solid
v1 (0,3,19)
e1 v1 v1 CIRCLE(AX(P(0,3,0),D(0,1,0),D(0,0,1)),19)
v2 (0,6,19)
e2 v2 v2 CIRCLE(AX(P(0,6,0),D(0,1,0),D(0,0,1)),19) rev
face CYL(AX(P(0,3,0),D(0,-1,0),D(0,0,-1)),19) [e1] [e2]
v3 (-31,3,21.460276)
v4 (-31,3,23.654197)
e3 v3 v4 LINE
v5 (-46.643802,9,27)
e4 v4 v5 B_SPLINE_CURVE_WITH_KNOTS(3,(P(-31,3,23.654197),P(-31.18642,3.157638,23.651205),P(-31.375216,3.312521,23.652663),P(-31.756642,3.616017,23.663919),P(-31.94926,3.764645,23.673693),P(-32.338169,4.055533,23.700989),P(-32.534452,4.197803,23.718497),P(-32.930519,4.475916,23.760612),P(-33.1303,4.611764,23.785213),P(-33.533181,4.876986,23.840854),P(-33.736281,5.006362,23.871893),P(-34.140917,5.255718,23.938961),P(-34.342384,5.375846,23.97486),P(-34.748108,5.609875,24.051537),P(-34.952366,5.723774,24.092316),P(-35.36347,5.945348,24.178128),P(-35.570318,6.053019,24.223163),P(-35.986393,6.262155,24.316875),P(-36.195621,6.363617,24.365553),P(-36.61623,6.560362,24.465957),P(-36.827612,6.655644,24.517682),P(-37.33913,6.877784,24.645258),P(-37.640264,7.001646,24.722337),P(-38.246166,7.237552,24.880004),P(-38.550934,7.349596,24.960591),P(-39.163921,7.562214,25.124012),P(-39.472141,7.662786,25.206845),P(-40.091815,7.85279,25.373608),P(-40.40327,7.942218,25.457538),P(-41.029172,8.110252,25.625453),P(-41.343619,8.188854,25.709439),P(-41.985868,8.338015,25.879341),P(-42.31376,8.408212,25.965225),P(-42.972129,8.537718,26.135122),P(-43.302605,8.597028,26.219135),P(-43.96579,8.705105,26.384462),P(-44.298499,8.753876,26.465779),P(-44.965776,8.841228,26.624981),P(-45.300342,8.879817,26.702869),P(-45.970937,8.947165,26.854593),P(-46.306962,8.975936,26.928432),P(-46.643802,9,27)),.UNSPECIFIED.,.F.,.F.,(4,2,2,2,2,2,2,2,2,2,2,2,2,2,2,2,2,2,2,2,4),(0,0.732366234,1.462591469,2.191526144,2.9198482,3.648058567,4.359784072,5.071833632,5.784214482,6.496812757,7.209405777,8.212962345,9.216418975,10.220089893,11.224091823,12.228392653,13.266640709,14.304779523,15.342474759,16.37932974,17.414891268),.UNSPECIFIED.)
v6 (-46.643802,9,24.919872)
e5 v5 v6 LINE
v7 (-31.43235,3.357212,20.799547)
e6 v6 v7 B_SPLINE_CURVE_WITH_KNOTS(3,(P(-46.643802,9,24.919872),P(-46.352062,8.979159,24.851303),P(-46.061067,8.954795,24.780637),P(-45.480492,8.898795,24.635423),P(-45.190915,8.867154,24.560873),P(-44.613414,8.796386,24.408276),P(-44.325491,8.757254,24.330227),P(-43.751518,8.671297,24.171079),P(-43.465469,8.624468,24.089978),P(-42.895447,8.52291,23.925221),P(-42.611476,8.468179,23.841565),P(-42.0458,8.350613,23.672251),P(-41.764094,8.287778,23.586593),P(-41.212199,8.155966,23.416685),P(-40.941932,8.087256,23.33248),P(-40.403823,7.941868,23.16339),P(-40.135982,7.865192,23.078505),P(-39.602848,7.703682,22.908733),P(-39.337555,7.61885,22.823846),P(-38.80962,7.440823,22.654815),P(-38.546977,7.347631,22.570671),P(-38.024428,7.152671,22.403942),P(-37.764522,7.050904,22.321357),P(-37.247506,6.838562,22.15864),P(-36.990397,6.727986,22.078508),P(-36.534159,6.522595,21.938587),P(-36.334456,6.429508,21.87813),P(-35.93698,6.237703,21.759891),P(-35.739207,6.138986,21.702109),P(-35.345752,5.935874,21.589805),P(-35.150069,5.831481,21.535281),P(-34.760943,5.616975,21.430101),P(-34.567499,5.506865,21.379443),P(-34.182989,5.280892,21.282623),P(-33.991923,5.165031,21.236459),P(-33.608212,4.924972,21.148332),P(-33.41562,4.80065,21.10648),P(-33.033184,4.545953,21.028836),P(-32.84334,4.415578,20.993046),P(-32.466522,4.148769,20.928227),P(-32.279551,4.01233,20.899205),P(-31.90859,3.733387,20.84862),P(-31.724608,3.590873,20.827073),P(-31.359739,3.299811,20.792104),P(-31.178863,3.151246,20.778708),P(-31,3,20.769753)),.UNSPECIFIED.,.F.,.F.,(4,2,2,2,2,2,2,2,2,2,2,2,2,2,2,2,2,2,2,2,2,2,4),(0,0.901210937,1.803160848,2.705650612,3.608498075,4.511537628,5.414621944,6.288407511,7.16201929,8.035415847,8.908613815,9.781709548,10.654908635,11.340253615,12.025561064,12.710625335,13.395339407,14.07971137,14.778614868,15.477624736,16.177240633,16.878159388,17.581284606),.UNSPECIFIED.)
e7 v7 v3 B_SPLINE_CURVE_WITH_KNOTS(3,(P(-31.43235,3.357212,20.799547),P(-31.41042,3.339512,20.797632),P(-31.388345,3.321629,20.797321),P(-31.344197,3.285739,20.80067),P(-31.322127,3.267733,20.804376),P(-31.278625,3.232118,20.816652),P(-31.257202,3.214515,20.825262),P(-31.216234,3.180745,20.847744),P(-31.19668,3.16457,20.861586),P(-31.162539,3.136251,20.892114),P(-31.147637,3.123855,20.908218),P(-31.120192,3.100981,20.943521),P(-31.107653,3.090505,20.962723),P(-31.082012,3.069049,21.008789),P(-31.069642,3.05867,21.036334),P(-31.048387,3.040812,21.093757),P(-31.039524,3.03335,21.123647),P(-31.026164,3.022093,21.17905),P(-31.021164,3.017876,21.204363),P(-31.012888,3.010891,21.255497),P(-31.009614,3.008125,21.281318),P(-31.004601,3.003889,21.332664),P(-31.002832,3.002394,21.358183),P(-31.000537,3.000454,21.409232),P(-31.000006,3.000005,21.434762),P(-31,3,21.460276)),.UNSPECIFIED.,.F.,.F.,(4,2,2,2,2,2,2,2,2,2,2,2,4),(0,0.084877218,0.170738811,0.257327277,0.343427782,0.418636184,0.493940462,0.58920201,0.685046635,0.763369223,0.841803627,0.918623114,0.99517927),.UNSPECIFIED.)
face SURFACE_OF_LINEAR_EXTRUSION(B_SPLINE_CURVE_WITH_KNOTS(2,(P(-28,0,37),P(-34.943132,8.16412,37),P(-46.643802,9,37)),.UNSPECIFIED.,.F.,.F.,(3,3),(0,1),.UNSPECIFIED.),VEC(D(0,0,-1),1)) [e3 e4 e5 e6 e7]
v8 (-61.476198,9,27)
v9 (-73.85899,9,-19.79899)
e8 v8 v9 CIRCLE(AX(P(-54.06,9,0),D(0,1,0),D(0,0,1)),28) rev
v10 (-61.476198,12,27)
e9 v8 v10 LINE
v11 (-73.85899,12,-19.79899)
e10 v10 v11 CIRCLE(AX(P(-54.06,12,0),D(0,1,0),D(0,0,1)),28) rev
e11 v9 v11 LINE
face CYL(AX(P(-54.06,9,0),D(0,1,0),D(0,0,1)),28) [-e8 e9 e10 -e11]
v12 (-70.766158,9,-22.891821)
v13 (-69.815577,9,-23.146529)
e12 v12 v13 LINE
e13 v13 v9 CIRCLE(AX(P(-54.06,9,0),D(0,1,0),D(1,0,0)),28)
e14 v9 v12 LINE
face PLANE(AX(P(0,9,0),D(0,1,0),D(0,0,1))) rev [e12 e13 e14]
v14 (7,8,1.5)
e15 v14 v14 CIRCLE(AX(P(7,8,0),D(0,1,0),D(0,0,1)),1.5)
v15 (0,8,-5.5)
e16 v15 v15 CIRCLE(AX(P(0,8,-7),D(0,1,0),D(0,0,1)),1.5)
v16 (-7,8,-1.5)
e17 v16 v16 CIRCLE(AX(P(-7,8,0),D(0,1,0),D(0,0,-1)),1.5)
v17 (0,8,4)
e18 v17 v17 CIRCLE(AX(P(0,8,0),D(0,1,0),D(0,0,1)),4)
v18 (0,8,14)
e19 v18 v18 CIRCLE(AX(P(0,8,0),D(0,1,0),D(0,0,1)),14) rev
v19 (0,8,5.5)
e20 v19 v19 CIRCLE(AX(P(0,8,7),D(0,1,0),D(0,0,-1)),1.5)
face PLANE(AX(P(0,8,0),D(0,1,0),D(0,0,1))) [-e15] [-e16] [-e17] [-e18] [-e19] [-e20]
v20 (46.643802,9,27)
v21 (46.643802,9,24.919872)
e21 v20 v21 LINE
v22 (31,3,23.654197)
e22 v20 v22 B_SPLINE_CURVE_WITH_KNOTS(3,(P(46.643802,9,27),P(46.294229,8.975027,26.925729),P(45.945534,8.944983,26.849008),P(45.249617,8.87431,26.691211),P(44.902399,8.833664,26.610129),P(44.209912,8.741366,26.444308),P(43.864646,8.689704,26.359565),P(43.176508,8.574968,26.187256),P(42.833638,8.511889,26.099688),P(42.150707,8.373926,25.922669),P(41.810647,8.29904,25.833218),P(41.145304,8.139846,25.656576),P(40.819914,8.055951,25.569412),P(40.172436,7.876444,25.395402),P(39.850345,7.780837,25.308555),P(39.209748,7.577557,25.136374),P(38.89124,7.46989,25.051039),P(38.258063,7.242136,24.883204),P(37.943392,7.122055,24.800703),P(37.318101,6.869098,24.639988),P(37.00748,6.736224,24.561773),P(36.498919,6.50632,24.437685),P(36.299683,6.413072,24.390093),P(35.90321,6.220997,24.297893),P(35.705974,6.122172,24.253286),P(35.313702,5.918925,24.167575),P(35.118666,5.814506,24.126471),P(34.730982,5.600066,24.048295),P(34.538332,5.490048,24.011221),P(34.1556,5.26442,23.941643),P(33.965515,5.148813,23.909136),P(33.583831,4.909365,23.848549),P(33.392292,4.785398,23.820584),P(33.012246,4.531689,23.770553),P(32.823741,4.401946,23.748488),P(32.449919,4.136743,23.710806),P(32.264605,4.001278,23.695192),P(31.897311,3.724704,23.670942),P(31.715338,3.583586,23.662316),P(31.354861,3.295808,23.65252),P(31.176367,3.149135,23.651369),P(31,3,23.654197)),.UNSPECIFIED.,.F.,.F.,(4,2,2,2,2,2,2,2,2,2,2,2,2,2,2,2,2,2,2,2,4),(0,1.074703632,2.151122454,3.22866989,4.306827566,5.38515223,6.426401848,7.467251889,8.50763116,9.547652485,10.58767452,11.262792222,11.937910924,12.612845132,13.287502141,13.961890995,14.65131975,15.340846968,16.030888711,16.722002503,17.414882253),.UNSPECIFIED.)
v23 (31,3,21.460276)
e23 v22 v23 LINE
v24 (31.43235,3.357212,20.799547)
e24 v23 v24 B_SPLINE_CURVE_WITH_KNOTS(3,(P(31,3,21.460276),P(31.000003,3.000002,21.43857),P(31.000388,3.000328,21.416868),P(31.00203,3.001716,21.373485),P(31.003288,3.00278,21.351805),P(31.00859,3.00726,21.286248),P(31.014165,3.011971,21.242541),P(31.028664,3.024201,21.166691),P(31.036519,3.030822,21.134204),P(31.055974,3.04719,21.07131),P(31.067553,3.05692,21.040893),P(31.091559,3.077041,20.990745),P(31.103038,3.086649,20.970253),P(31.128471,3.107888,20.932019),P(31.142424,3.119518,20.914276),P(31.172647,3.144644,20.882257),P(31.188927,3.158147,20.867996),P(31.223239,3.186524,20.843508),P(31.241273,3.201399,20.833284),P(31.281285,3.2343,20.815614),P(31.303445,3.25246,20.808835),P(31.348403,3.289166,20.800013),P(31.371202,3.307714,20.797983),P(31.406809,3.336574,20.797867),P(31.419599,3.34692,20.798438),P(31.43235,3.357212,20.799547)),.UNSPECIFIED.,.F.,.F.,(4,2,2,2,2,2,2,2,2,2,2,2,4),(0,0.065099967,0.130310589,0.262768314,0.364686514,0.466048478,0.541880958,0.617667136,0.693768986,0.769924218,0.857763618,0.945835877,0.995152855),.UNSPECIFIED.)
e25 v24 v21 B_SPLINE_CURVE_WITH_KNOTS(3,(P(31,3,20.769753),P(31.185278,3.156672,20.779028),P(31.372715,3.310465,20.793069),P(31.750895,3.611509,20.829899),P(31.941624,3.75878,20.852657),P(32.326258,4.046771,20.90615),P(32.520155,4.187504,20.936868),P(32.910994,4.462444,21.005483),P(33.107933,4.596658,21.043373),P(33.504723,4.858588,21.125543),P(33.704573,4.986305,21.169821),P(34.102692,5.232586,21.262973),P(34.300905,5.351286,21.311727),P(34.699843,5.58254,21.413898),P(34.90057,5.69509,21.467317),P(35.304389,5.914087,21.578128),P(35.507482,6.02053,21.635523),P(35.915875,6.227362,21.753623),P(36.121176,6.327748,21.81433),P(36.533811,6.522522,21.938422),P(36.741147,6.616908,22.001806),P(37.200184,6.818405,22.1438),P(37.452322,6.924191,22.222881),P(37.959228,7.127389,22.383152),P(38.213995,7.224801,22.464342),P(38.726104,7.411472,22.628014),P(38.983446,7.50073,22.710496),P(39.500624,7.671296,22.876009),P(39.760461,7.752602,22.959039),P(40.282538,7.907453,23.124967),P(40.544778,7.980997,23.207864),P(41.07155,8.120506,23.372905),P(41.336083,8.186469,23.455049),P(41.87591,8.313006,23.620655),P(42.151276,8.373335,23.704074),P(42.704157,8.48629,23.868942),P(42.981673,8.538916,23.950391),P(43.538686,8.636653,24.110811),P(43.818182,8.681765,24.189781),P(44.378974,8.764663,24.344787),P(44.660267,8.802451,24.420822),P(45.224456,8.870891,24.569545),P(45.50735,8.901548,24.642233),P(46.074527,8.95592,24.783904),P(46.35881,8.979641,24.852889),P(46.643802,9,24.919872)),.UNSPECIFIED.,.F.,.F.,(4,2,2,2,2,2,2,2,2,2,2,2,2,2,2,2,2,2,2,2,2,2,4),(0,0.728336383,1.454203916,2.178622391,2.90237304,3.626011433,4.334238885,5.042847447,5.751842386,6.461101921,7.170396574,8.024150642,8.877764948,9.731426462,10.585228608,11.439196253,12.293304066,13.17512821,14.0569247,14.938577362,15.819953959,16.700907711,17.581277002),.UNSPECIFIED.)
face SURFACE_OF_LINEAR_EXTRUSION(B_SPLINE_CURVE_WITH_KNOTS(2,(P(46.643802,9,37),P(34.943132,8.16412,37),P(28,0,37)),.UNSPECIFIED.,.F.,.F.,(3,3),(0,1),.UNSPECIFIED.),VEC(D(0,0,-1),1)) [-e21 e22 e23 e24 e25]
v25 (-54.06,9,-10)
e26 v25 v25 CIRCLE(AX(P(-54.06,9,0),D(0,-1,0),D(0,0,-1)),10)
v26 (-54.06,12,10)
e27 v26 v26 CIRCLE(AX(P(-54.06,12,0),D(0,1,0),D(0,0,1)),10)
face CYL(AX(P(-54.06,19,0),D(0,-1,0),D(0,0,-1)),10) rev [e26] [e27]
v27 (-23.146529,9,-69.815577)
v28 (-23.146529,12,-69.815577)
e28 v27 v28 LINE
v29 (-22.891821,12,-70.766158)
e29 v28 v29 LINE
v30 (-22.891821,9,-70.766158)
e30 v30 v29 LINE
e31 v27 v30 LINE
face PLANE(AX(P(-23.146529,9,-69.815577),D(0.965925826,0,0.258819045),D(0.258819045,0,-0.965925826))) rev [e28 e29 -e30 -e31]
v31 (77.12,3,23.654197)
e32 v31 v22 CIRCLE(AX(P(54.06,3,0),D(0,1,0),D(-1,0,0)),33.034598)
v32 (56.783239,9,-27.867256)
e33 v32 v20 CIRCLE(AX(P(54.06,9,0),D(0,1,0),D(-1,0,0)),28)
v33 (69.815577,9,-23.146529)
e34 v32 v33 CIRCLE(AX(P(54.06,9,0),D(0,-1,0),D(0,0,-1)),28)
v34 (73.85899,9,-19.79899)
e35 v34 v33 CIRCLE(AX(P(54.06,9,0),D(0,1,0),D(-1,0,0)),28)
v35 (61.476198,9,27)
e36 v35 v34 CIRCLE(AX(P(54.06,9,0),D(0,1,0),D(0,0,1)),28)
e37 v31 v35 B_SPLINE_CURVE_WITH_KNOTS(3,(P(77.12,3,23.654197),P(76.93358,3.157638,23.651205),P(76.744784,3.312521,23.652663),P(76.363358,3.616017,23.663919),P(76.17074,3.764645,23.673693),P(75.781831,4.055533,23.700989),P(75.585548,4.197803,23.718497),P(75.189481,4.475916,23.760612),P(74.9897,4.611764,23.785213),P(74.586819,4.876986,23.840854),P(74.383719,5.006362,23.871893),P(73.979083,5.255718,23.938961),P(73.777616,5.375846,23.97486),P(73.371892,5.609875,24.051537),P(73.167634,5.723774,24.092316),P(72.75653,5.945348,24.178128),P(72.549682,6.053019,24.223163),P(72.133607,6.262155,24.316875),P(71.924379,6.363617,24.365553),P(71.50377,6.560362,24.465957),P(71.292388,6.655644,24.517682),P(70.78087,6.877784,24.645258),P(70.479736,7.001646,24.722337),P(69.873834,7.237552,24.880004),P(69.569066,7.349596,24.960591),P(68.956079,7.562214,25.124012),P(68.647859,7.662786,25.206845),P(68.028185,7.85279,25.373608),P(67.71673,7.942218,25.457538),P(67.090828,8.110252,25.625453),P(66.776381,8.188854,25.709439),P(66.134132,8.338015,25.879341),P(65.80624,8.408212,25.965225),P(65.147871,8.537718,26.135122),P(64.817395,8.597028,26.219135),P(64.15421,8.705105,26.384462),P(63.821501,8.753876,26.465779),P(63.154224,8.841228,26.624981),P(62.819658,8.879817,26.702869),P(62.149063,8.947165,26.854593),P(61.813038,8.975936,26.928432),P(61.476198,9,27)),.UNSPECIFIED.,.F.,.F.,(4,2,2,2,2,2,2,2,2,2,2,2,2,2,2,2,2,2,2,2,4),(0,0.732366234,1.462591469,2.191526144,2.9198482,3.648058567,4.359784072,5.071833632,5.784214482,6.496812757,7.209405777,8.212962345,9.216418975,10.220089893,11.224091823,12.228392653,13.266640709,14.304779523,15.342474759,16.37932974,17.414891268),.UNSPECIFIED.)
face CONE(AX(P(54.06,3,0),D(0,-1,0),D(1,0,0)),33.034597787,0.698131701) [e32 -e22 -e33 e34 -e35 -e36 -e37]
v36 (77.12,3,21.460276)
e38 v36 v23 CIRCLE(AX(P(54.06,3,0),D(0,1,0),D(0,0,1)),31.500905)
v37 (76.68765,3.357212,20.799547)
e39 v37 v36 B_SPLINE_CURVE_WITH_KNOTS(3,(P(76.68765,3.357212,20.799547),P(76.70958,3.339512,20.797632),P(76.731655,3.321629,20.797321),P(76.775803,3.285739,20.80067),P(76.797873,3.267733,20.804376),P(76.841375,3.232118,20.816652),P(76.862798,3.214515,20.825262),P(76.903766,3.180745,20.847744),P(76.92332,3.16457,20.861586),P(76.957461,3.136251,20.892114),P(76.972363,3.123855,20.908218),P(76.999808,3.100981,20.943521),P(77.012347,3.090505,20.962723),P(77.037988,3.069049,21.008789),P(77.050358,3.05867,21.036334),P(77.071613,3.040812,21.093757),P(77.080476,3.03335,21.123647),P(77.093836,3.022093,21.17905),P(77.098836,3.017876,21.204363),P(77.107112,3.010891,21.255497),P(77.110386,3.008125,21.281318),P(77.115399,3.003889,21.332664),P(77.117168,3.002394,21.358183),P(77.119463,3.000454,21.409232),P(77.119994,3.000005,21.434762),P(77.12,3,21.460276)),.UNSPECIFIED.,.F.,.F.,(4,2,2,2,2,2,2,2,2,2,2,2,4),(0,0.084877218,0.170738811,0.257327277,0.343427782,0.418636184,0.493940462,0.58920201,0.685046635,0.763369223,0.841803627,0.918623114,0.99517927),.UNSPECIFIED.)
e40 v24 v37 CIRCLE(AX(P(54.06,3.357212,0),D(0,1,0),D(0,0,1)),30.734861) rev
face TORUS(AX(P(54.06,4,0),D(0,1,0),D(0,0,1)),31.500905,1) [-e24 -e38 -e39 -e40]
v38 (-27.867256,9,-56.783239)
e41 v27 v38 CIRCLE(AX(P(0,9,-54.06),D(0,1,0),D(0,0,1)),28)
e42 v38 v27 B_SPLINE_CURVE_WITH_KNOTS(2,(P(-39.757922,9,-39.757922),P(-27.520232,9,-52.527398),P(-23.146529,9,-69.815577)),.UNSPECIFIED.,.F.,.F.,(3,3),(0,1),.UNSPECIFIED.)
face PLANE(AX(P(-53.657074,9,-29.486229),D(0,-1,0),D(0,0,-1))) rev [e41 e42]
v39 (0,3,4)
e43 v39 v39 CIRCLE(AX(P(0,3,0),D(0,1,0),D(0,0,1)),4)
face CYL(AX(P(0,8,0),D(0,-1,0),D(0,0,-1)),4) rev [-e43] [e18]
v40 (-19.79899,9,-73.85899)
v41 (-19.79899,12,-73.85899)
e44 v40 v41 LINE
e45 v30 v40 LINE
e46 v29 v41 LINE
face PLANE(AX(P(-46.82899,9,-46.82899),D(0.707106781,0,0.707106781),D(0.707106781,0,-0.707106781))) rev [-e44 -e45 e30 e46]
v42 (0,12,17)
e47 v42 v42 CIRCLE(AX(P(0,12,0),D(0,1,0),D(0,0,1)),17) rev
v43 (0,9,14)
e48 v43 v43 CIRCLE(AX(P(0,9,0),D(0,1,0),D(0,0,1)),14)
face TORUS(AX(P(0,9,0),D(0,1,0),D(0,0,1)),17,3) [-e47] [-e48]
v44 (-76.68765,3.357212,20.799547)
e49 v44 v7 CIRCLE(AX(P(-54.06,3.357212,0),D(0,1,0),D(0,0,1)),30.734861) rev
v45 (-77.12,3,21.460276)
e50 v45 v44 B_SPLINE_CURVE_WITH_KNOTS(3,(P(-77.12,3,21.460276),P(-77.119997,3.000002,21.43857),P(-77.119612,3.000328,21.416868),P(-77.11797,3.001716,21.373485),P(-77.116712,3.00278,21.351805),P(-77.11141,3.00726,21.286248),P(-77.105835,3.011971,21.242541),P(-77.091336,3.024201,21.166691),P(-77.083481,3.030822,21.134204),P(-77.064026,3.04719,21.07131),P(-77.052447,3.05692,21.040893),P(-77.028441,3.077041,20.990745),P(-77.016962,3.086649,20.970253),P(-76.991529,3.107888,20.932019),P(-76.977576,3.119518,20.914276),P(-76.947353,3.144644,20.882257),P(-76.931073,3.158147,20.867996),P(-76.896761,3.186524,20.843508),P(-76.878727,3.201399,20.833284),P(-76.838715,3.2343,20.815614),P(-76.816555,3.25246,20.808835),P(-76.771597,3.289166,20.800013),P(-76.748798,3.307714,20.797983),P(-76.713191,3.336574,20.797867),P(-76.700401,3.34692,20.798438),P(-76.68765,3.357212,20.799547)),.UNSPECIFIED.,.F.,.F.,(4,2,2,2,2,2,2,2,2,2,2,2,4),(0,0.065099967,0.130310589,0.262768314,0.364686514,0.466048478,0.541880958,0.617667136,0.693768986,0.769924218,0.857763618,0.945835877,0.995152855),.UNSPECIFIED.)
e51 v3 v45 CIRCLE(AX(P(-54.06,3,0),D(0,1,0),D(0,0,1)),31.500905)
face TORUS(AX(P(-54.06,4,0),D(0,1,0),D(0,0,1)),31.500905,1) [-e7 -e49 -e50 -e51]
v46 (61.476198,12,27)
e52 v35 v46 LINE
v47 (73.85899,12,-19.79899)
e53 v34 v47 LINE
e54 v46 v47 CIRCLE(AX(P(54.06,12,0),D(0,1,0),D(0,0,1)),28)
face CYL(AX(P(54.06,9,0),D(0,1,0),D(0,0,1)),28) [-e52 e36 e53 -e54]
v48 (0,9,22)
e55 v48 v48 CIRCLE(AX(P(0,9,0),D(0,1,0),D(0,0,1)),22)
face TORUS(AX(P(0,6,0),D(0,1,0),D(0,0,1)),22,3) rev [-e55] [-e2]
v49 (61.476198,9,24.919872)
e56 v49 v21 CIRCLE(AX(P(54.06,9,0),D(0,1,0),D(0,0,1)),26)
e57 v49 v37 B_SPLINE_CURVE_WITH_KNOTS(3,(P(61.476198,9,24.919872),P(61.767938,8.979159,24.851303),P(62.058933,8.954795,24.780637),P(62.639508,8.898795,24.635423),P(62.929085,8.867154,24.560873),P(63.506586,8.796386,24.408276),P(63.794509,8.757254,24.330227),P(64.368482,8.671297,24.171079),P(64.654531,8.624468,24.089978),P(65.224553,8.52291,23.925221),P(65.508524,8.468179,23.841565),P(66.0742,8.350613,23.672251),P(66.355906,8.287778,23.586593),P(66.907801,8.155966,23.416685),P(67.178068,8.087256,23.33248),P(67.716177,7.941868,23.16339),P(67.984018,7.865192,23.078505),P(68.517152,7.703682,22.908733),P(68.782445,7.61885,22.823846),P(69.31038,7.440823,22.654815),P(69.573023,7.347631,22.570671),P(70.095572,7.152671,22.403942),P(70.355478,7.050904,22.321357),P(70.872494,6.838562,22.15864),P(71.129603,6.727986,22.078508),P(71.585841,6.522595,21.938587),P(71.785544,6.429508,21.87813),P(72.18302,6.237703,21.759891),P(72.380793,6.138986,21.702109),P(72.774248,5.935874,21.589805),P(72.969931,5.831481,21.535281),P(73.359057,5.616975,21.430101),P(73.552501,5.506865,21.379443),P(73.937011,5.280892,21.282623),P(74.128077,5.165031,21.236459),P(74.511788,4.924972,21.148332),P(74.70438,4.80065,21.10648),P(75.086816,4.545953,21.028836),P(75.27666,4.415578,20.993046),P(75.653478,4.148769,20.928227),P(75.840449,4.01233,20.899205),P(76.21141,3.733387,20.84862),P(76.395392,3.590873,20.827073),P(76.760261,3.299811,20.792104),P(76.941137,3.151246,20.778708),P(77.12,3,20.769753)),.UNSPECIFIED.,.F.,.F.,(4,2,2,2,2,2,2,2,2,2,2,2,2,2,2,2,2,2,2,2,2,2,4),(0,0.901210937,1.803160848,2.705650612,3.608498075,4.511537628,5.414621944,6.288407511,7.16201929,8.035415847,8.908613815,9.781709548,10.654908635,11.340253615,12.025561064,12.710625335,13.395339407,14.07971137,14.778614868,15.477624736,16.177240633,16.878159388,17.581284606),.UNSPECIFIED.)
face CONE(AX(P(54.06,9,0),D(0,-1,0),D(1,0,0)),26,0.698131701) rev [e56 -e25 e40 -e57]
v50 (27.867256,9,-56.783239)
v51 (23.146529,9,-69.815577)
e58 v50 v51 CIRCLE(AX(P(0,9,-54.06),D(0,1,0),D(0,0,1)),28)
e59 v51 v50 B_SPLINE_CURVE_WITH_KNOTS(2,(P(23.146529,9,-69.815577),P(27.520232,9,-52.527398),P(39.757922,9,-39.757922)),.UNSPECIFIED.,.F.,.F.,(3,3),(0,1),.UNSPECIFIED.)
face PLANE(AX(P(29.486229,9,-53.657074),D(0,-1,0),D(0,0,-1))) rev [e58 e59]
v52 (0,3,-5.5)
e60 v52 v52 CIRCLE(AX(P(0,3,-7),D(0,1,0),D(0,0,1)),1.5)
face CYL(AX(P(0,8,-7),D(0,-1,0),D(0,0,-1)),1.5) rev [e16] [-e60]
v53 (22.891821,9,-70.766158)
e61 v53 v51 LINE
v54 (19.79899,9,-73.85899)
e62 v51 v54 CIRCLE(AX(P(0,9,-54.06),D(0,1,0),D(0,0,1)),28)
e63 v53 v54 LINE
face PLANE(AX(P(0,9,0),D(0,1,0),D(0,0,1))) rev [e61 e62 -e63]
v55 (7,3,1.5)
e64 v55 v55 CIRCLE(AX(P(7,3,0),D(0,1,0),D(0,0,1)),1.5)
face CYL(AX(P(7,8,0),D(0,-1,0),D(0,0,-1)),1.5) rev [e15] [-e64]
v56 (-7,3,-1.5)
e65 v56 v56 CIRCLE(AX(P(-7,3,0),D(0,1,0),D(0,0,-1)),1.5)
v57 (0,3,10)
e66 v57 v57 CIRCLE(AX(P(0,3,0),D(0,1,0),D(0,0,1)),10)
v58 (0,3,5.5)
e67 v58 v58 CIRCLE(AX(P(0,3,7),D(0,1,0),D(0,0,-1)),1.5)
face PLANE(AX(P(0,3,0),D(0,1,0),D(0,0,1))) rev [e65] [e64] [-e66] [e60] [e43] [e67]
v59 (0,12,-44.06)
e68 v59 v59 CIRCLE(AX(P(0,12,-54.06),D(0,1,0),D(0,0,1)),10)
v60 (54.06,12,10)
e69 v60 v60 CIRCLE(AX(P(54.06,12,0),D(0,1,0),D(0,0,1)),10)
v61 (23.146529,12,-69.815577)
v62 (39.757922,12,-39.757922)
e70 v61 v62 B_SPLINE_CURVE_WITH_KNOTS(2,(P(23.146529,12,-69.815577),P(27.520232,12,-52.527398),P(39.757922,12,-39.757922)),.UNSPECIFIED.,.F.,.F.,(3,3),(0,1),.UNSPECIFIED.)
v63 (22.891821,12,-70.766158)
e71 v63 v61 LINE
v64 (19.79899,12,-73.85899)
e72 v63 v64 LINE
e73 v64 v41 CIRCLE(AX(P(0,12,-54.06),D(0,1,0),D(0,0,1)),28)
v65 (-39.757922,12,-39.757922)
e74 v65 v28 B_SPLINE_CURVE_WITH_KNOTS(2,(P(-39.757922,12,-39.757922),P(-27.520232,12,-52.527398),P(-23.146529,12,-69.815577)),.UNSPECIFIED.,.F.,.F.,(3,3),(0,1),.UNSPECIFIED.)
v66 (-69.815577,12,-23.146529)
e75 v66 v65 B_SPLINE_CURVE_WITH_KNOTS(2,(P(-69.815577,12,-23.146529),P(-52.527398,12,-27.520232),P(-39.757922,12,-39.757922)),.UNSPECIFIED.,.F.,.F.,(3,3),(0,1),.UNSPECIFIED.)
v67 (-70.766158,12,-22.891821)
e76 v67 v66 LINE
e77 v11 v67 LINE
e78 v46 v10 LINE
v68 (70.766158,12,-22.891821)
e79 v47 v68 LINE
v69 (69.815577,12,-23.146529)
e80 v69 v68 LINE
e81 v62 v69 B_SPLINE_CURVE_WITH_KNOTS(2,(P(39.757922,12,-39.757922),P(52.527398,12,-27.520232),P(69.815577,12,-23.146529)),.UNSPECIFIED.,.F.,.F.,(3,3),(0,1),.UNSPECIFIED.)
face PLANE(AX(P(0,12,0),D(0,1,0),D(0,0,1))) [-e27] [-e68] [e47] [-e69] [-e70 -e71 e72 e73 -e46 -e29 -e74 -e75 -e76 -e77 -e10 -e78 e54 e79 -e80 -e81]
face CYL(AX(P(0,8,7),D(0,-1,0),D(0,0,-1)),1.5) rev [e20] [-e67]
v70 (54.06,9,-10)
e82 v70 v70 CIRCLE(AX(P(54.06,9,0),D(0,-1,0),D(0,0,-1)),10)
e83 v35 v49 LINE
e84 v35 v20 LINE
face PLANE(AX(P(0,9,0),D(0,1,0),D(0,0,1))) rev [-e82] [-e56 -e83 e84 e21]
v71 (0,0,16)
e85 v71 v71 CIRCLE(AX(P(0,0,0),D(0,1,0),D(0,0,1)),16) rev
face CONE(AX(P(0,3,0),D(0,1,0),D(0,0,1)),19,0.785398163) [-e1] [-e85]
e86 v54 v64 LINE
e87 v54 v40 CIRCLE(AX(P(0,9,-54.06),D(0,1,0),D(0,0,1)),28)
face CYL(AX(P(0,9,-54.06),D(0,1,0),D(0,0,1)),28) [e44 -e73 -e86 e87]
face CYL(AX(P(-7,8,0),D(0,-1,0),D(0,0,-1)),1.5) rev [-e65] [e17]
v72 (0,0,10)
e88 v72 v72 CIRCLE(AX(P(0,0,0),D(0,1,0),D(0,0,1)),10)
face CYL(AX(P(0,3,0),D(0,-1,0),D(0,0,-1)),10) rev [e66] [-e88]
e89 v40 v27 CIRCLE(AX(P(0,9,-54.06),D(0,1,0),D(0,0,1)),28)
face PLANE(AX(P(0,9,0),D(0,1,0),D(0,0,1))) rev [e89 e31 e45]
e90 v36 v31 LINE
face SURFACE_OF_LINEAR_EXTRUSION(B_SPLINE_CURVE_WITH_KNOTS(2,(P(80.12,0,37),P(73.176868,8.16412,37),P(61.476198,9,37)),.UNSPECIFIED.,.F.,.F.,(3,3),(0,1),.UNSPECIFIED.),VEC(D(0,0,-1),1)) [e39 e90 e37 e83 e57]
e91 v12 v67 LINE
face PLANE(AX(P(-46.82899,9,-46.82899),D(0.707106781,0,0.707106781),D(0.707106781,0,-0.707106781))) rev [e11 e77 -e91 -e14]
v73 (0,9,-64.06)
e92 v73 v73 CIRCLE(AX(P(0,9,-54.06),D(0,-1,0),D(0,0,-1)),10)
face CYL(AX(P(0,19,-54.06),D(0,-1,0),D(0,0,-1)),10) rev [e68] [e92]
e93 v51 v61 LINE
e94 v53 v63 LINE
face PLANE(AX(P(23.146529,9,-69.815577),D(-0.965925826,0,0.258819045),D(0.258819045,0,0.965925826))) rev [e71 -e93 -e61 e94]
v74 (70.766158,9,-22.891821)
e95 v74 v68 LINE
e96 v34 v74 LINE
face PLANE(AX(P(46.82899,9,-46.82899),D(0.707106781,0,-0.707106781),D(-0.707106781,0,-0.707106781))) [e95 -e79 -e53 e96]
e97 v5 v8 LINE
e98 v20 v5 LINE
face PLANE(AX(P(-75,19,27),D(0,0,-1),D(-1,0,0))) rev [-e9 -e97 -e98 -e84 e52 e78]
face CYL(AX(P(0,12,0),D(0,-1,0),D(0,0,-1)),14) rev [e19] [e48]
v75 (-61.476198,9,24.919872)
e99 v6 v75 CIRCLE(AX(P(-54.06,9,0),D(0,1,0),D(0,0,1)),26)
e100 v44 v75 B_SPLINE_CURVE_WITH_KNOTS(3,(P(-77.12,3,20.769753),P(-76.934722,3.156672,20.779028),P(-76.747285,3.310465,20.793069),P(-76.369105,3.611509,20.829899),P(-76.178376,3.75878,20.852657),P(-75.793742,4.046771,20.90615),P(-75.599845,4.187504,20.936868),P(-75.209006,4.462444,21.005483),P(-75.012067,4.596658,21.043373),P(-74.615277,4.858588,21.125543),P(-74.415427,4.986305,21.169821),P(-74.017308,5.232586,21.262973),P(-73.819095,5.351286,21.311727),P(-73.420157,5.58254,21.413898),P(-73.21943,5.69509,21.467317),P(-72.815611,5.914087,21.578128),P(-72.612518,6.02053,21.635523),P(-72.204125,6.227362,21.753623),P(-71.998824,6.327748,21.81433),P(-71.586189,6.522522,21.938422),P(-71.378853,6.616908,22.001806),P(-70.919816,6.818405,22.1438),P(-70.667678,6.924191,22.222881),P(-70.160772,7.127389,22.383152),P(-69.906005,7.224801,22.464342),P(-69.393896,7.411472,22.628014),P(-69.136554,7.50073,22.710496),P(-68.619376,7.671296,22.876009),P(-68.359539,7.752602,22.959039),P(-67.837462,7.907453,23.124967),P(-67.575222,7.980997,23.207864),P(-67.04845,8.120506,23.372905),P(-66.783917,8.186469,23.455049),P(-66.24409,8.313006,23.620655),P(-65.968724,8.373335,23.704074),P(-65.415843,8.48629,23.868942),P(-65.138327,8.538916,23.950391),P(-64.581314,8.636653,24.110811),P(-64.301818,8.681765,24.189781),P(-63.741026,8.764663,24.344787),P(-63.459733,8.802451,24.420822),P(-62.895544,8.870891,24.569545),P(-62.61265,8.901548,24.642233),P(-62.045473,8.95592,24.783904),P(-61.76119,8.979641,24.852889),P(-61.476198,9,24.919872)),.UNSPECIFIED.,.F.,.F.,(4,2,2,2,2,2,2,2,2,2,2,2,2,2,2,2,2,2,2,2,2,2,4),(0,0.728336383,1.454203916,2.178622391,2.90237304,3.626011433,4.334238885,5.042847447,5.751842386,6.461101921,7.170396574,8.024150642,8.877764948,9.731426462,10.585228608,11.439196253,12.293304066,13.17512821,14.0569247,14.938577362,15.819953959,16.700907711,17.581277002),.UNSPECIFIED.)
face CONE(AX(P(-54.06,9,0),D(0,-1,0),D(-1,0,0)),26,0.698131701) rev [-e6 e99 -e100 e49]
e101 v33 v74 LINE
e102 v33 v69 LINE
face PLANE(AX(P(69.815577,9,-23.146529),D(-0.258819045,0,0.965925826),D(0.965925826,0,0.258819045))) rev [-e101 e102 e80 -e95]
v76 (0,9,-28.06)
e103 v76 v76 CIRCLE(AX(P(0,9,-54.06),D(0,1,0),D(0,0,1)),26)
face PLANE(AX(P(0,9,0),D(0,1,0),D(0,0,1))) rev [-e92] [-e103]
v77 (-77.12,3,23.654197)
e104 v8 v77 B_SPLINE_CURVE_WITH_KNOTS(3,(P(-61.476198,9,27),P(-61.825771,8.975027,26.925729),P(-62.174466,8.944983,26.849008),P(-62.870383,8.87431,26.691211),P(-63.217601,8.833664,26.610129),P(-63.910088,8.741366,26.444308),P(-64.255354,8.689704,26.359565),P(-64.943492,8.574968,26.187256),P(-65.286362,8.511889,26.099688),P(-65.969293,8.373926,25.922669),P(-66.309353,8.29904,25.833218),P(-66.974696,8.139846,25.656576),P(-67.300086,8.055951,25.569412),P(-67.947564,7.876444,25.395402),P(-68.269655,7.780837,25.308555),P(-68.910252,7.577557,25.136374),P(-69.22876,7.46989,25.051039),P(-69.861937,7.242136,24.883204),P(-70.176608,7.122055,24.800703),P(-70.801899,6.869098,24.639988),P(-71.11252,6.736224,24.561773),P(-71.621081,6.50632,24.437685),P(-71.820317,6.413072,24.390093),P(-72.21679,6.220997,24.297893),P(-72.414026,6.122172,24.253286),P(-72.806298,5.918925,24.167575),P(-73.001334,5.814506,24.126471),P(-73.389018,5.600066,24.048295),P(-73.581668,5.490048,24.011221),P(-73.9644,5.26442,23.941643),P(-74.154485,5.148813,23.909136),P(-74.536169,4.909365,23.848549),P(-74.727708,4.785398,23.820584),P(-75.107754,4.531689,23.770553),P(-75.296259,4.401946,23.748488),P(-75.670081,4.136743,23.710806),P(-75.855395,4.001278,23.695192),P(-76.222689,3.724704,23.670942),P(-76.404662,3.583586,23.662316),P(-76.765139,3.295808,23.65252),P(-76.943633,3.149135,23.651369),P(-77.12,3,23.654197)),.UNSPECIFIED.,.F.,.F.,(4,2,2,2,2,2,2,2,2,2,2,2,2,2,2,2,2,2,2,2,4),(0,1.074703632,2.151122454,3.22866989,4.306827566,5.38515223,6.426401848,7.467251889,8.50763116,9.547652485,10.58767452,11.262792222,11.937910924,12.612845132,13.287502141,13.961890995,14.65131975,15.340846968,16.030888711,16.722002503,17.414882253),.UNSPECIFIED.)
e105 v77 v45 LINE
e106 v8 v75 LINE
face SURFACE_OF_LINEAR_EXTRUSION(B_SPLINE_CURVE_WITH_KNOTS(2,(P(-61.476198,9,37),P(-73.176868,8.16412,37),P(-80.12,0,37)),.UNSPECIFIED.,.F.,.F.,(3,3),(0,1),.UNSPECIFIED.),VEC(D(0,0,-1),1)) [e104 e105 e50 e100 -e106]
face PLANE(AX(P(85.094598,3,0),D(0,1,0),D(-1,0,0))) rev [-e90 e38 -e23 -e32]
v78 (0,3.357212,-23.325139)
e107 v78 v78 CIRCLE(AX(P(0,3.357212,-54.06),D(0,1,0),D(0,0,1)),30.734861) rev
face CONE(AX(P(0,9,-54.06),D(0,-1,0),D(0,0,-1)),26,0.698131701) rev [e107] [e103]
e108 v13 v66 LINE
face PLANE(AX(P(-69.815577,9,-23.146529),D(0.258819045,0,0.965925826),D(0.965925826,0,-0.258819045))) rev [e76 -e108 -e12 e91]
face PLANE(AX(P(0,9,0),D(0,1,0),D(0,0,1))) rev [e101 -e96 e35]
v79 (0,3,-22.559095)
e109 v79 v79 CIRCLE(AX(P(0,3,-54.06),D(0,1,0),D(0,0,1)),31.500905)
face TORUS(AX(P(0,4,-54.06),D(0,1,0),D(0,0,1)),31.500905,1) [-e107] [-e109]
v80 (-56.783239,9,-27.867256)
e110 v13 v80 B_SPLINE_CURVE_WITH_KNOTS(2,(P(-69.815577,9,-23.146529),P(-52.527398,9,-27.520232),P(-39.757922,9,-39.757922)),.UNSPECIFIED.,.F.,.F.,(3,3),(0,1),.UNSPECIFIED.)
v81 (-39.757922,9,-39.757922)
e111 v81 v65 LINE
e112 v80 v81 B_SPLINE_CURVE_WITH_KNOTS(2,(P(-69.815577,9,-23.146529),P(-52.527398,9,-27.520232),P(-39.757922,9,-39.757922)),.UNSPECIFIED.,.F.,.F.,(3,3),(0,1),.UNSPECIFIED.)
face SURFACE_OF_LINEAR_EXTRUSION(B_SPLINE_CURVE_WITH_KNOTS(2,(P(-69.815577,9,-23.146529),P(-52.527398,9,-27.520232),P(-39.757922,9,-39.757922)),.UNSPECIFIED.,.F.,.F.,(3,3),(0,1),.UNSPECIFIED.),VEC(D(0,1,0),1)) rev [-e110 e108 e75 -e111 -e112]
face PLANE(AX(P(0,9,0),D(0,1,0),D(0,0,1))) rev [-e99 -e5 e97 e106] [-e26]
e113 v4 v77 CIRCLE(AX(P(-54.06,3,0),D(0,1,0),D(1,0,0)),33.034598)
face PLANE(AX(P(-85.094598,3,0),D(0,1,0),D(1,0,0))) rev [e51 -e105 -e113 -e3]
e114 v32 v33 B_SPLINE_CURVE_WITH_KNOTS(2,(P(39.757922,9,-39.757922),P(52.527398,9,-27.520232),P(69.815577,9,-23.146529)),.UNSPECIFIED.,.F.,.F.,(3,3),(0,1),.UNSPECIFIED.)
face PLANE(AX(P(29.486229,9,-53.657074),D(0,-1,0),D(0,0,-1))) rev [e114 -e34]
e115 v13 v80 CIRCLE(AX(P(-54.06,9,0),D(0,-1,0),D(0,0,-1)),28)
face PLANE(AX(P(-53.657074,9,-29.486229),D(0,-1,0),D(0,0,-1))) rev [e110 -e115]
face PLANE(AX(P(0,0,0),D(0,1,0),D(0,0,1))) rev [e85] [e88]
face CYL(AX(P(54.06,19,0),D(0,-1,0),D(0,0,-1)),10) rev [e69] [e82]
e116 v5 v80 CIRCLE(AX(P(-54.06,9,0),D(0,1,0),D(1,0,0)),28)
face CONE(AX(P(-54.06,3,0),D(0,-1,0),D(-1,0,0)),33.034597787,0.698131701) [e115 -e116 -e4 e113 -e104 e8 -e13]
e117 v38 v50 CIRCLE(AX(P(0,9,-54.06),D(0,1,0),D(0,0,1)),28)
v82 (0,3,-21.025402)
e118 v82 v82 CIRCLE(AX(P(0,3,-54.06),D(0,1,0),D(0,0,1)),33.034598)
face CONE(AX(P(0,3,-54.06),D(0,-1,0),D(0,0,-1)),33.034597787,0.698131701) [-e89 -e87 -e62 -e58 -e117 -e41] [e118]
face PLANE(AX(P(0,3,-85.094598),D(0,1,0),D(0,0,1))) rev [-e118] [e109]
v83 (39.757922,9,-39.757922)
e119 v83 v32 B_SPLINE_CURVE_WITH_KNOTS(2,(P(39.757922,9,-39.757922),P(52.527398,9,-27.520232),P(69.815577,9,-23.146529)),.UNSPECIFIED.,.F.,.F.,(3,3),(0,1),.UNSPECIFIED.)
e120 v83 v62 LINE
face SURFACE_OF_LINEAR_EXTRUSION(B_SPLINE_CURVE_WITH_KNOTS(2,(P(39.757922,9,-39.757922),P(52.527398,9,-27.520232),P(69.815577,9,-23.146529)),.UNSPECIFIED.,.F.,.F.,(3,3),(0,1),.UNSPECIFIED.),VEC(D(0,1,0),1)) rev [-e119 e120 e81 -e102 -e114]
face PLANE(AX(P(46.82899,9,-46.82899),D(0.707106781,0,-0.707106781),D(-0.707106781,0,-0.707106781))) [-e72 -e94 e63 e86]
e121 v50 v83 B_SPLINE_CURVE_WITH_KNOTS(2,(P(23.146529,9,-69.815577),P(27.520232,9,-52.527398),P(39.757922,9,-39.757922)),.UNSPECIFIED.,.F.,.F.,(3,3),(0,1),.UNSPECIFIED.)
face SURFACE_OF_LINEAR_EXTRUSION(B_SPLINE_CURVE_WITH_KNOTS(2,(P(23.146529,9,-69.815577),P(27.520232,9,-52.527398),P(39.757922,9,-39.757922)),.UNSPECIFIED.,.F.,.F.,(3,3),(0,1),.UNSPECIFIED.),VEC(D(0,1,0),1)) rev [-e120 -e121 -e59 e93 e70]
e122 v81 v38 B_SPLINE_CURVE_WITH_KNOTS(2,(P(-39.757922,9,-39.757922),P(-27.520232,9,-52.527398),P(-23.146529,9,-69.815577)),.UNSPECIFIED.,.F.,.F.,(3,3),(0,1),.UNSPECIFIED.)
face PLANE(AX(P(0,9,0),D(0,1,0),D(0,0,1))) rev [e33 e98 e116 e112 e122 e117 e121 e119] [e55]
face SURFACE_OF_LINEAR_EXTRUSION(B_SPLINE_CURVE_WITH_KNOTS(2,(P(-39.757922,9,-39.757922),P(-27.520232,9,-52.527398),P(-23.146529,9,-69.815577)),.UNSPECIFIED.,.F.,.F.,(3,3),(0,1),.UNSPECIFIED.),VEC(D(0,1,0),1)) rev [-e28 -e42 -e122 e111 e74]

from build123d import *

# Parameters (mm, degrees)
SKETCH_1_R               = 19
SKETCH_1_R_2             = 10
EXTRUDE_1_DEPTH          = 3
SKETCH_4_R               = 14
SKETCH_4_R_2             = 1.5
SKETCH_4_R_3             = 4
EXTRUDE_2_DEPTH          = 5
SKETCH_5_R               = 19
SKETCH_5_R_2             = 14
EXTRUDE_3_DEPTH          = 9
EXTRUDE_START            = -3
SKETCH_6_R               = 14
EXTRUDE_4_DEPTH          = 3
PATTERN_CIRCULAR_1_COUNT = 2
PATTERN_CIRCULAR_1_ANGLE = 90
PATTERN_CIRCULAR_2_COUNT = 2
PATTERN_CIRCULAR_2_ANGLE = 90
CHAMFER_1_SIZE           = 3
SKETCH_9_R               = 10
CUT_EXTRUDE_1_DEPTH      = 10
CUT_EXTRUDE_3_DEPTH      = 10
CUT_EXTRUDE_3_DEPTH_BACK = 10
SKETCH_13_W              = 150
SKETCH_13_H              = 10
CUT_EXTRUDE_5_DEPTH      = 37
FILLET_2_R               = 1
FILLET_3_R               = 3
CUT_EXTRUDE_6_DEPTH      = 3


with BuildPart() as part:
    # 草图1 → 凸台-拉伸1 (new body)
    with BuildSketch(Plane(origin=(0, 0, 0), x_dir=(1, 0, 0), z_dir=(0, 1, 0))):
        Circle(SKETCH_1_R)
        Circle(SKETCH_1_R_2, mode=Mode.SUBTRACT)
    extrude(amount=EXTRUDE_1_DEPTH)

    # 草图4 → 凸台-拉伸2 (add)
    with BuildSketch(Plane(origin=(0, 3, 0), x_dir=(1, 0, 0), z_dir=(0, 1, 0))):
        Circle(SKETCH_4_R)
        with Locations((0, 7)):
            Circle(SKETCH_4_R_2, mode=Mode.SUBTRACT)
        with Locations((7, 0)):
            Circle(SKETCH_4_R_2, mode=Mode.SUBTRACT)
        with Locations((0, -7)):
            Circle(SKETCH_4_R_2, mode=Mode.SUBTRACT)
        with Locations((-7, 0)):
            Circle(SKETCH_4_R_2, mode=Mode.SUBTRACT)
        Circle(SKETCH_4_R_3, mode=Mode.SUBTRACT)
    extrude(amount=EXTRUDE_2_DEPTH)

    # 草图5 → 凸台-拉伸3 (add)
    with BuildSketch(Plane(origin=(0, 3, 0), x_dir=(1, 0, 0), z_dir=(0, 1, 0))):
        Circle(SKETCH_5_R)
        Circle(SKETCH_5_R_2, mode=Mode.SUBTRACT)
    extrude(amount=EXTRUDE_3_DEPTH)

    # 草图6 → 凸台-拉伸4 (add)
    with BuildSketch(Plane(origin=(0, 12, 0), x_dir=(1, 0, 0), z_dir=(0, 1, 0)).offset(EXTRUDE_START)):
        with BuildLine():
            Line((-19.798989873, 73.858989873), (-73.858989873, 19.798989873))
            ThreePointArc((-73.858989873, 19.798989873), (-79.92862691, -10.715136106), (-54.06, -28))
            Line((-54.06, -28), (54.06, -28))
            ThreePointArc((54.06, -28), (79.92862691, -10.715136106), (73.858989873, 19.798989873))
            Line((73.858989873, 19.798989873), (19.798989873, 73.858989873))
            ThreePointArc((19.798989873, 73.858989873), (0, 82.06), (-19.798989873, 73.858989873))
        make_face()
        Circle(SKETCH_6_R, mode=Mode.SUBTRACT)
    extrude(amount=EXTRUDE_4_DEPTH)

    # 草图8 → 旋转1 (revolve)
    with BuildSketch(Plane(origin=(0, 0, 0), x_dir=(0, 0, -1), z_dir=(1, 0, 0))):
        Polygon((82.06, 9), (80.06, 9), (85.094597787, 3), (87.094597787, 3), align=None)
    revolve_1 = revolve(axis=Axis((0, 9, -54.06), (0, -1, 0)))

    # 阵列(圆周)1: 旋转1 ×2 about axis
    pattern_circular_1_axis = Axis((0, -0.6, 0), (0, 1, 0))
    for i in range(1, PATTERN_CIRCULAR_1_COUNT):
        add(revolve_1.rotate(pattern_circular_1_axis, i * PATTERN_CIRCULAR_1_ANGLE / (PATTERN_CIRCULAR_1_COUNT - 1)))

    # 阵列(圆周)2: 旋转1 ×2 about axis
    pattern_circular_2_axis = Axis((0, -0.6, 0), (0, -1, 0))
    for i in range(1, PATTERN_CIRCULAR_2_COUNT):
        add(revolve_1.rotate(pattern_circular_2_axis, i * PATTERN_CIRCULAR_2_ANGLE / (PATTERN_CIRCULAR_2_COUNT - 1)))

    # 倒角1
    chamfer_1_edges = [part.edges().sort_by_distance(p)[0] for p in [
        (-19, 0, 0),
    ]]
    chamfer(chamfer_1_edges, length=CHAMFER_1_SIZE)

    # 草图9 → 切除-拉伸1 (cut)
    with BuildSketch(Plane.XZ.offset(-9)):
        with Locations((0, -54.06)):
            Circle(SKETCH_9_R)
        with Locations((-54.06, 0)):
            Circle(SKETCH_9_R)
        with Locations((54.06, 0)):
            Circle(SKETCH_9_R)
    extrude(amount=-CUT_EXTRUDE_1_DEPTH, mode=Mode.SUBTRACT)

    # 草图13 → 切除-拉伸3 (cut, two sides: drawn at the far end of the back side and taken through both)
    with BuildSketch(Plane.XZ.offset(-9).offset(-CUT_EXTRUDE_3_DEPTH_BACK)):
        with Locations((0, 32)):
            Rectangle(SKETCH_13_W, SKETCH_13_H)
    extrude(amount=CUT_EXTRUDE_3_DEPTH + CUT_EXTRUDE_3_DEPTH_BACK, mode=Mode.SUBTRACT)

    # 草图14 → 切除-拉伸5 (cut)
    with BuildSketch(Plane.XY):
        with BuildLine():
            Line((46.643801513, 9), (61.476198487, 9))
            add(Edge.make_bspline(
                [(80.12, 0), (73.176867554, 8.16412003), (61.476198487, 9)],
                knots=[0, 0, 0, 1, 1, 1], degree=2))
            Line((80.12, 0), (28, 0))
            add(Edge.make_bspline(
                [(28, 0), (34.943132446, 8.16412003), (46.643801513, 9)],
                knots=[0, 0, 0, 1, 1, 1], degree=2))
        make_face()
        with BuildLine():
            Line((-46.643801513, 9), (-61.476198487, 9))
            add(Edge.make_bspline(
                [(-80.12, 0), (-73.176867554, 8.16412003), (-61.476198487, 9)],
                knots=[0, 0, 0, 1, 1, 1], degree=2))
            Line((-80.12, 0), (-28, 0))
            add(Edge.make_bspline(
                [(-28, 0), (-34.943132446, 8.16412003), (-46.643801513, 9)],
                knots=[0, 0, 0, 1, 1, 1], degree=2))
        make_face()
    extrude(amount=CUT_EXTRUDE_5_DEPTH, mode=Mode.SUBTRACT)

    # 圆角2
    fillet_2_edges = [part.edges().sort_by_distance(p)[0] for p in [
        (54.06, 3, -31.034597787),
        (0, 3, -23.025402213),
        (-54.06, 3, -31.034597787),
    ]]
    fillet(fillet_2_edges, radius=FILLET_2_R)

    # 圆角3
    fillet_3_edges = [part.edges().sort_by_distance(p)[0] for p in [
        (-19, 9, 0),
        (-14, 12, 0),
    ]]
    fillet(fillet_3_edges, radius=FILLET_3_R)

    # 草图15 → 切除-拉伸6 (cut)
    with BuildSketch(Plane(origin=(0, 12, 0), x_dir=(1, 0, 0), z_dir=(0, 1, 0))):
        with BuildLine():
            Line((-69.815576591, 23.146529033), (-70.76615832, 22.891821426))
            Line((-70.76615832, 22.891821426), (-22.891821426, 70.76615832))
            Line((-22.891821426, 70.76615832), (-23.146529033, 69.815576591))
            add(Edge.make_bspline(
                [(-23.146529033, 69.815576591), (-27.520231774, 52.527398209), (-39.757922061, 39.757922061)],
                knots=[0, 0, 0, 1, 1, 1], degree=2))
            add(Edge.make_bspline(
                [(-69.815576591, 23.146529033), (-52.527398209, 27.520231774), (-39.757922061, 39.757922061)],
                knots=[0, 0, 0, 1, 1, 1], degree=2))
        make_face()
        with BuildLine():
            Line((70.76615832, 22.891821426), (22.891821426, 70.76615832))
            Line((22.891821426, 70.76615832), (23.146529033, 69.815576591))
            add(Edge.make_bspline(
                [(23.146529033, 69.815576591), (27.520231774, 52.527398209), (39.757922061, 39.757922061)],
                knots=[0, 0, 0, 1, 1, 1], degree=2))
            add(Edge.make_bspline(
                [(69.815576591, 23.146529033), (52.527398209, 27.520231774), (39.757922061, 39.757922061)],
                knots=[0, 0, 0, 1, 1, 1], degree=2))
            Line((69.815576591, 23.146529033), (70.76615832, 22.891821426))
        make_face()
    extrude(amount=-CUT_EXTRUDE_6_DEPTH, mode=Mode.SUBTRACT)


solid = part.part
